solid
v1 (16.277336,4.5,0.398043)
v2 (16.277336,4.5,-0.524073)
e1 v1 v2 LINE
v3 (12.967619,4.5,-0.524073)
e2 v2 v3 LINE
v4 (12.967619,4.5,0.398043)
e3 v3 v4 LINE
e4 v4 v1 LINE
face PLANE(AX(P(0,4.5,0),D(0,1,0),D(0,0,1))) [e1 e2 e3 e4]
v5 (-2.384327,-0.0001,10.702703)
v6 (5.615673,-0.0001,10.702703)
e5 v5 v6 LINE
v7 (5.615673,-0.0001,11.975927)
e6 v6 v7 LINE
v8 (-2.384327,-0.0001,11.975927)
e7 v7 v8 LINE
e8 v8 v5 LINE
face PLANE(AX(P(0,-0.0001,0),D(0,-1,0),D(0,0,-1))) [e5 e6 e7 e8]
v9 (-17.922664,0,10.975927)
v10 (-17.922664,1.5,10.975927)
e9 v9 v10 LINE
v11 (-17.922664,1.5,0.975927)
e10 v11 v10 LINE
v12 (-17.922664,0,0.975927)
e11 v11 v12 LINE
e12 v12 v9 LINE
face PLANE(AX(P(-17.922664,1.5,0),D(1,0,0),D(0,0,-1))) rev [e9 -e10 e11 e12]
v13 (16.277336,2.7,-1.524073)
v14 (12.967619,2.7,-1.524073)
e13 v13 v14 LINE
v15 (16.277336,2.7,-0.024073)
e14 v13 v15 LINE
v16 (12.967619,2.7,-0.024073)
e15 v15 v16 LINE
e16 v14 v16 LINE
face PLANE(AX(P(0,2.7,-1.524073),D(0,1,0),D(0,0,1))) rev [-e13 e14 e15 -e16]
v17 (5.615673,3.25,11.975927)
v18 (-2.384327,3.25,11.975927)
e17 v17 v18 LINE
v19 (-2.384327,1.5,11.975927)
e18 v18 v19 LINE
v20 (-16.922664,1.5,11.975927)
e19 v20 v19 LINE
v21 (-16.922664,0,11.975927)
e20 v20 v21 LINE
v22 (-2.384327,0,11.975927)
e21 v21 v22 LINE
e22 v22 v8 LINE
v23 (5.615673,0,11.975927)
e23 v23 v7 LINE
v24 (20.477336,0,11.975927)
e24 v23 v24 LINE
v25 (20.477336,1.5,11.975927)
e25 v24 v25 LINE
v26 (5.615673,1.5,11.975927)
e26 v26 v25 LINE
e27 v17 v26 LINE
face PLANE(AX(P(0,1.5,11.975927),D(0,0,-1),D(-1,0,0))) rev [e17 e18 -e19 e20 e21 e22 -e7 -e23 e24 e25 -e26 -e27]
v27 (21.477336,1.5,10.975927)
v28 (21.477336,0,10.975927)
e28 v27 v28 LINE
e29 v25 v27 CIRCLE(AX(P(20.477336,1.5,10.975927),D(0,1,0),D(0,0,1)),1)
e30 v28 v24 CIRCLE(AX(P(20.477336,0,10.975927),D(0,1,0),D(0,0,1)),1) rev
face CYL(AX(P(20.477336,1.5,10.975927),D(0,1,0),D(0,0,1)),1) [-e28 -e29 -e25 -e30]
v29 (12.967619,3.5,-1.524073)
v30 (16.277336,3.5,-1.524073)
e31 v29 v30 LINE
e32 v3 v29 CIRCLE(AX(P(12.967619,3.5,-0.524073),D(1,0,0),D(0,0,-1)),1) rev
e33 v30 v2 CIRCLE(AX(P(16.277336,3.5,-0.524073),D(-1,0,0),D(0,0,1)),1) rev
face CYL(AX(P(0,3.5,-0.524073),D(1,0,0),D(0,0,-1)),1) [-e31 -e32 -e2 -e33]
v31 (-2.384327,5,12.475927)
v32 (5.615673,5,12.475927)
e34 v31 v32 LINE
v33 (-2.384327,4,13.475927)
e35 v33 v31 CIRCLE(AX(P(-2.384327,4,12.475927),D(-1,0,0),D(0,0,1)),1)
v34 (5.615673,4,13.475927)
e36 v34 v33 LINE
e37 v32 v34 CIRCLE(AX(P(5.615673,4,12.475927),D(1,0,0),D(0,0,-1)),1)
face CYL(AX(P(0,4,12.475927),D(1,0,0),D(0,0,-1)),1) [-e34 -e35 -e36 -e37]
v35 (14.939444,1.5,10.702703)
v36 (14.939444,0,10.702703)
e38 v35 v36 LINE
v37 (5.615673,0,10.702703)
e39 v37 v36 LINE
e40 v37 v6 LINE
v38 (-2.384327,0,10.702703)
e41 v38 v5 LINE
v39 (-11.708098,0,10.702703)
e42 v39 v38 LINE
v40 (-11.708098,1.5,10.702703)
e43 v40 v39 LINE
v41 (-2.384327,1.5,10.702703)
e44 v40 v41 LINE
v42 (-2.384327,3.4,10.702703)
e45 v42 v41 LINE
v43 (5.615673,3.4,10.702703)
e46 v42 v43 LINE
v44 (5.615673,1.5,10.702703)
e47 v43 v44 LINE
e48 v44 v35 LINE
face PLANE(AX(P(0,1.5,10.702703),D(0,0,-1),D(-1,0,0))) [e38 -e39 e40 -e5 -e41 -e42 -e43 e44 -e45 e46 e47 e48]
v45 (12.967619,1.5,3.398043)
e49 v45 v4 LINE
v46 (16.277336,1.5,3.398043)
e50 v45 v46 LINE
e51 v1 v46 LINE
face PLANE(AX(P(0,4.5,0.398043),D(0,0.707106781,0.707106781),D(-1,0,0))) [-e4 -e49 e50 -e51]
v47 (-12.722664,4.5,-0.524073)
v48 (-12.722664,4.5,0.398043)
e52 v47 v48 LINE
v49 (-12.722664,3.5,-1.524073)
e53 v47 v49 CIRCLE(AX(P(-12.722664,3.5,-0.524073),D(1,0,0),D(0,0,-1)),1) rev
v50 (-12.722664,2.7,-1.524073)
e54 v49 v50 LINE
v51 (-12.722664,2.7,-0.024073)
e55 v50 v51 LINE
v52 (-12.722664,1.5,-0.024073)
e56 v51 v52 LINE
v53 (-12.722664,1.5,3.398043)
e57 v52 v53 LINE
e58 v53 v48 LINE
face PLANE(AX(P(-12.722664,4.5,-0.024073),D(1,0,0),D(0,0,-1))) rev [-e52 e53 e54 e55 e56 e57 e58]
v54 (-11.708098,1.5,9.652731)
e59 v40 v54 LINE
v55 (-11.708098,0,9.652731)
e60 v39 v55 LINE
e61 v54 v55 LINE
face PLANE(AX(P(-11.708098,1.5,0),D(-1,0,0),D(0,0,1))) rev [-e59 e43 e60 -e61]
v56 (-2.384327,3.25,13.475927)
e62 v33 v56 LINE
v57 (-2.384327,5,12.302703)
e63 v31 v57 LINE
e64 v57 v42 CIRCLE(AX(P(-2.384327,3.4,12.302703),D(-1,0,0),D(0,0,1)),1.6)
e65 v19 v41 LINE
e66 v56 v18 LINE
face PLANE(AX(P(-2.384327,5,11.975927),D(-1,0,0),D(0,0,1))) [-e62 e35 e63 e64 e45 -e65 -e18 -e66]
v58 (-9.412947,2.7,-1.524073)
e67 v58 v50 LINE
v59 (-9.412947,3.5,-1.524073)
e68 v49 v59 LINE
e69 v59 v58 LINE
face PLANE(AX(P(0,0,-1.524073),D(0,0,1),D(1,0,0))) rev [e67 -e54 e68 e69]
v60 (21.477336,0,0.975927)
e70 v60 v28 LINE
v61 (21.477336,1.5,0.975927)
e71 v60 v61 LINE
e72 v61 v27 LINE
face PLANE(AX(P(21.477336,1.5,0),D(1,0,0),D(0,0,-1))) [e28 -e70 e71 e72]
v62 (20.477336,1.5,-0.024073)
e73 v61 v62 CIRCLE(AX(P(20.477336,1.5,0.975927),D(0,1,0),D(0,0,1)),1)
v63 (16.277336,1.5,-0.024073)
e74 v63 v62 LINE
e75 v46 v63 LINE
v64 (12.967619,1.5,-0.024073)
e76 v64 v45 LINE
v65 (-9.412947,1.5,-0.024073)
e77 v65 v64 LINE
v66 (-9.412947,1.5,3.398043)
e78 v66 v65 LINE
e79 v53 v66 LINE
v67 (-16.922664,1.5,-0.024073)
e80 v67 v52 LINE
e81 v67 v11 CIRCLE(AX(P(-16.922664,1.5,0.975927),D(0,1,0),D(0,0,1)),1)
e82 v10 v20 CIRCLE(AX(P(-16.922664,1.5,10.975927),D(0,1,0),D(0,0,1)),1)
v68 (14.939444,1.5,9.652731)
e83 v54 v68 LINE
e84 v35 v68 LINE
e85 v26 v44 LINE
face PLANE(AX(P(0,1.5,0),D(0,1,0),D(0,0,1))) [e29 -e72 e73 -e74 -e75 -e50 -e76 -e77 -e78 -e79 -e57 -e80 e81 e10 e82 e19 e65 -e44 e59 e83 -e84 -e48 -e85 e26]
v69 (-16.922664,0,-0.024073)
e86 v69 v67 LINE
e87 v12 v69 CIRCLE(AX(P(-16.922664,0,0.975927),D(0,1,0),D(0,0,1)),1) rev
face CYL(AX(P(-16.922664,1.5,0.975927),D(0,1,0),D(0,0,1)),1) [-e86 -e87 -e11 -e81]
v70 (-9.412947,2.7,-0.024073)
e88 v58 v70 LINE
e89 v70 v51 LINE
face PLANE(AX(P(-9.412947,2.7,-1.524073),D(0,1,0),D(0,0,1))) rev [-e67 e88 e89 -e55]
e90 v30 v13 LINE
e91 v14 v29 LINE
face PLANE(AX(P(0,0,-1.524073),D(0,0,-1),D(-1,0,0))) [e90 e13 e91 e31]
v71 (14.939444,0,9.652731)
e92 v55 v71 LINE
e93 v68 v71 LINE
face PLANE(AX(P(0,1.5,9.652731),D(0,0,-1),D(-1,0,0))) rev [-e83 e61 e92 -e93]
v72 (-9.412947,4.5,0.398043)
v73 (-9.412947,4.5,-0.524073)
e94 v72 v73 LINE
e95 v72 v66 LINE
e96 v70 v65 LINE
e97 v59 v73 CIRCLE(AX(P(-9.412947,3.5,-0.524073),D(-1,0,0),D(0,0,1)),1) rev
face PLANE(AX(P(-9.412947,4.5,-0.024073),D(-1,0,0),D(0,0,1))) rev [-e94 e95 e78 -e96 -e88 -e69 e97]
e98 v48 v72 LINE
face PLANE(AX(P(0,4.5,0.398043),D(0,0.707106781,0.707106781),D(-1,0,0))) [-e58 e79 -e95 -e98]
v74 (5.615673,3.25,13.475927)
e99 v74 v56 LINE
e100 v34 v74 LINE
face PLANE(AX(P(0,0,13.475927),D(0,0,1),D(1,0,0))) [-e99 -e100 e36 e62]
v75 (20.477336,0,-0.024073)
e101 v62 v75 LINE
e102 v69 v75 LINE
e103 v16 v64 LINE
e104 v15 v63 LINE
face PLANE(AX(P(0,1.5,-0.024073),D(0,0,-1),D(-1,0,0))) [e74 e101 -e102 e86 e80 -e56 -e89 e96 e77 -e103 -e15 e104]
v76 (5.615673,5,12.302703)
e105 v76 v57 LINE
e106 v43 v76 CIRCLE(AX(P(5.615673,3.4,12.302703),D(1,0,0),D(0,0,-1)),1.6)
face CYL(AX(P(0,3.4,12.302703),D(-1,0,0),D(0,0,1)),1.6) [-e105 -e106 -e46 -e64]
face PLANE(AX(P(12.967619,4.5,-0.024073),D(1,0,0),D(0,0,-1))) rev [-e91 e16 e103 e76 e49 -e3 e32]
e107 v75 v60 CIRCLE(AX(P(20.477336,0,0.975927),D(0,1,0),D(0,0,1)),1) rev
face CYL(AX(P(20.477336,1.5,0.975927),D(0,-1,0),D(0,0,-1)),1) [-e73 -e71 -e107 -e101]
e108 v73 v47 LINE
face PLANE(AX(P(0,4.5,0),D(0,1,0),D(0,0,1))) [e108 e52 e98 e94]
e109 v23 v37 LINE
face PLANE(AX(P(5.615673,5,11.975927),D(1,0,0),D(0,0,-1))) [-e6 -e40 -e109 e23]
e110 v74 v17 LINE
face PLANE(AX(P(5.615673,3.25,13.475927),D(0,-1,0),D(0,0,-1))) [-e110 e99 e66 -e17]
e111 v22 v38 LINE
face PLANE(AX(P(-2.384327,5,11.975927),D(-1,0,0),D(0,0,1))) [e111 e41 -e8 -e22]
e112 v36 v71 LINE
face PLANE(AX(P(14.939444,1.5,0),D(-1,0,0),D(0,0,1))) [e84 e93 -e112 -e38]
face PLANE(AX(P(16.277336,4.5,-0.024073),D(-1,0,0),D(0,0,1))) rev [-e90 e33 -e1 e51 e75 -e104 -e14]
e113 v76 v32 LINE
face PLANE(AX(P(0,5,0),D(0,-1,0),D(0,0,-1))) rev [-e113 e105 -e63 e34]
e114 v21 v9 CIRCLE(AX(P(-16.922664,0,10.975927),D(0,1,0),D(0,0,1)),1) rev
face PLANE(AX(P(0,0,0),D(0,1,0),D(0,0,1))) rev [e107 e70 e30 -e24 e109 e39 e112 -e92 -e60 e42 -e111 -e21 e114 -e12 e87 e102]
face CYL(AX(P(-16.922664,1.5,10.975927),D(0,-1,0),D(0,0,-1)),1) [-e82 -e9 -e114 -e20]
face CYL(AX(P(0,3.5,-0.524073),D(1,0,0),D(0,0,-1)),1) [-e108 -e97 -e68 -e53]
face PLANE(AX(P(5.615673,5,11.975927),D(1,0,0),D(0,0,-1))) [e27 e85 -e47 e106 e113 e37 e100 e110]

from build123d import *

# Parameters (mm, degrees)
SKETCH1_W                 = 3
SKETCH1_H                 = 1.629773482
SKETCH1_H_2               = 1.605700765
BOSS_EXTRUDE21_DEPTH      = 1.5
BOSS_EXTRUDE22_DEPTH      = 0.0001
BOSS_EXTRUDE22_DEPTH_BACK = 5
SKETCH4_W                 = 8
SKETCH4_H                 = 1.27322458
SKETCH5_W                 = 8
SKETCH5_H                 = 1.75
BOSS_EXTRUDE23_DEPTH      = 1.5
SKETCH6_W                 = 3.309716912
SKETCH6_H                 = 3.42211522
SKETCH6_W_2               = 3.309716913
BOSS_EXTRUDE24_DEPTH      = 3
SKETCH8_W                 = 3.309716912
SKETCH8_H                 = 1.8
SKETCH8_W_2               = 3.309716913
BOSS_EXTRUDE26_DEPTH      = 1.5
FILLET1_R                 = 1
FILLET2_R                 = 1
CHAMFER4_SIZE             = 3
FILLET3_R                 = 1.6


with BuildPart() as part:
    # Sketch1 → Boss-Extrude21 (new body)
    # profile 1 of 3: a face of its own
    with BuildSketch(Plane(origin=(0, 0, 0), x_dir=(1, 0, 0), z_dir=(0, 1, 0))):
        with Locations((14.277336143, -0.790814024)):
            Rectangle(SKETCH1_W, SKETCH1_H)
    # profile 2 of 3: a face of its own
    with BuildSketch(Plane(origin=(0, 0, 0), x_dir=(1, 0, 0), z_dir=(0, 1, 0))):
        Polygon((-2.384327038, -10.702702703), (-11.708098218, -10.702702703), (-11.708098218, -9.652730884), (14.939444142, -9.652730884), (14.939444142, -10.702702703), (5.615672962, -10.702702703), (5.615672962, -11.975927283), (21.477336143, -11.975927283), (21.477336143, 0.024072717), (15.777336143, 0.024072717), (15.777336143, -1.605700765), (12.777336143, -1.605700765), (12.777336143, 0.024072717), (-17.922663857, 0.024072717), (-17.922663857, -11.975927283), (-2.384327038, -11.975927283), align=None)
        with Locations((-10.768292904, -0.870035762)):
            Rectangle(SKETCH1_W, SKETCH1_H_2, mode=Mode.SUBTRACT)
    # profile 3 of 3: a face of its own
    with BuildSketch(Plane(origin=(0, 0, 0), x_dir=(1, 0, 0), z_dir=(0, 1, 0))):
        with Locations((-10.768292904, -0.870035762)):
            Rectangle(SKETCH1_W, SKETCH1_H_2)
    extrude(amount=BOSS_EXTRUDE21_DEPTH)

    # Sketch4 → Boss-Extrude22 (add, two sides: drawn at the far end of the back side and taken through both)
    with BuildSketch(Plane.XZ.offset(-BOSS_EXTRUDE22_DEPTH_BACK)):
        with Locations((1.615672962, 11.339314993)):
            Rectangle(SKETCH4_W, SKETCH4_H)
    extrude(amount=BOSS_EXTRUDE22_DEPTH + BOSS_EXTRUDE22_DEPTH_BACK)

    # Sketch5 → Boss-Extrude23 (add)
    with BuildSketch(Plane.XY.offset(11.975927283)):
        with Locations((1.615672962, 4.125)):
            Rectangle(SKETCH5_W, SKETCH5_H)
    extrude(amount=BOSS_EXTRUDE23_DEPTH)

    # Sketch6 → Boss-Extrude24 (add)
    with BuildSketch(Plane(origin=(0, 1.5, 0), x_dir=(1, 0, 0), z_dir=(0, 1, 0))):
        with Locations((14.622477687, -1.686984893)):
            Rectangle(SKETCH6_W, SKETCH6_H)
        with Locations((-11.0678054, -1.686984893)):
            Rectangle(SKETCH6_W_2, SKETCH6_H)
    extrude(amount=BOSS_EXTRUDE24_DEPTH)

    # Sketch8 → Boss-Extrude26 (add)
    with BuildSketch(Plane(origin=(0, 0, -0.024072717), x_dir=(-1, 0, 0), z_dir=(0, 0, -1))):
        with Locations((-14.622477687, 3.6)):
            Rectangle(SKETCH8_W, SKETCH8_H)
        with Locations((11.0678054, 3.6)):
            Rectangle(SKETCH8_W_2, SKETCH8_H)
    extrude(amount=BOSS_EXTRUDE26_DEPTH)

    # Fillet1
    fillet1_edges = [part.edges().sort_by_distance(p)[0] for p in [
        (-11.0678054, 4.5, -1.524072717),
        (1.615672962, 5, 13.475927283),
        (14.622477687, 4.5, -1.524072717),
    ]]
    fillet(fillet1_edges, radius=FILLET1_R)

    # Fillet2
    fillet2_edges = [part.edges().sort_by_distance(p)[0] for p in [
        (21.477336143, 0.75, 11.975927283),
        (-17.922663857, 0.75, 11.975927283),
        (-17.922663857, 0.75, -0.024072717),
        (21.477336143, 0.75, -0.024072717),
    ]]
    fillet(fillet2_edges, radius=FILLET2_R)

    # Chamfer4
    chamfer4_edges = [part.edges().sort_by_distance(p)[0] for p in [
        (14.622477687, 4.5, 3.398042503),
        (-11.0678054, 4.5, 3.398042503),
    ]]
    chamfer(chamfer4_edges, length=CHAMFER4_SIZE - 0.0001)  # a hair under: the kernel refuses the full size

    # Fillet3
    fillet3_edges = [part.edges().sort_by_distance(p)[0] for p in [
        (1.615672962, 5, 10.702702703),
    ]]
    fillet(fillet3_edges, radius=FILLET3_R)


solid = part.part
